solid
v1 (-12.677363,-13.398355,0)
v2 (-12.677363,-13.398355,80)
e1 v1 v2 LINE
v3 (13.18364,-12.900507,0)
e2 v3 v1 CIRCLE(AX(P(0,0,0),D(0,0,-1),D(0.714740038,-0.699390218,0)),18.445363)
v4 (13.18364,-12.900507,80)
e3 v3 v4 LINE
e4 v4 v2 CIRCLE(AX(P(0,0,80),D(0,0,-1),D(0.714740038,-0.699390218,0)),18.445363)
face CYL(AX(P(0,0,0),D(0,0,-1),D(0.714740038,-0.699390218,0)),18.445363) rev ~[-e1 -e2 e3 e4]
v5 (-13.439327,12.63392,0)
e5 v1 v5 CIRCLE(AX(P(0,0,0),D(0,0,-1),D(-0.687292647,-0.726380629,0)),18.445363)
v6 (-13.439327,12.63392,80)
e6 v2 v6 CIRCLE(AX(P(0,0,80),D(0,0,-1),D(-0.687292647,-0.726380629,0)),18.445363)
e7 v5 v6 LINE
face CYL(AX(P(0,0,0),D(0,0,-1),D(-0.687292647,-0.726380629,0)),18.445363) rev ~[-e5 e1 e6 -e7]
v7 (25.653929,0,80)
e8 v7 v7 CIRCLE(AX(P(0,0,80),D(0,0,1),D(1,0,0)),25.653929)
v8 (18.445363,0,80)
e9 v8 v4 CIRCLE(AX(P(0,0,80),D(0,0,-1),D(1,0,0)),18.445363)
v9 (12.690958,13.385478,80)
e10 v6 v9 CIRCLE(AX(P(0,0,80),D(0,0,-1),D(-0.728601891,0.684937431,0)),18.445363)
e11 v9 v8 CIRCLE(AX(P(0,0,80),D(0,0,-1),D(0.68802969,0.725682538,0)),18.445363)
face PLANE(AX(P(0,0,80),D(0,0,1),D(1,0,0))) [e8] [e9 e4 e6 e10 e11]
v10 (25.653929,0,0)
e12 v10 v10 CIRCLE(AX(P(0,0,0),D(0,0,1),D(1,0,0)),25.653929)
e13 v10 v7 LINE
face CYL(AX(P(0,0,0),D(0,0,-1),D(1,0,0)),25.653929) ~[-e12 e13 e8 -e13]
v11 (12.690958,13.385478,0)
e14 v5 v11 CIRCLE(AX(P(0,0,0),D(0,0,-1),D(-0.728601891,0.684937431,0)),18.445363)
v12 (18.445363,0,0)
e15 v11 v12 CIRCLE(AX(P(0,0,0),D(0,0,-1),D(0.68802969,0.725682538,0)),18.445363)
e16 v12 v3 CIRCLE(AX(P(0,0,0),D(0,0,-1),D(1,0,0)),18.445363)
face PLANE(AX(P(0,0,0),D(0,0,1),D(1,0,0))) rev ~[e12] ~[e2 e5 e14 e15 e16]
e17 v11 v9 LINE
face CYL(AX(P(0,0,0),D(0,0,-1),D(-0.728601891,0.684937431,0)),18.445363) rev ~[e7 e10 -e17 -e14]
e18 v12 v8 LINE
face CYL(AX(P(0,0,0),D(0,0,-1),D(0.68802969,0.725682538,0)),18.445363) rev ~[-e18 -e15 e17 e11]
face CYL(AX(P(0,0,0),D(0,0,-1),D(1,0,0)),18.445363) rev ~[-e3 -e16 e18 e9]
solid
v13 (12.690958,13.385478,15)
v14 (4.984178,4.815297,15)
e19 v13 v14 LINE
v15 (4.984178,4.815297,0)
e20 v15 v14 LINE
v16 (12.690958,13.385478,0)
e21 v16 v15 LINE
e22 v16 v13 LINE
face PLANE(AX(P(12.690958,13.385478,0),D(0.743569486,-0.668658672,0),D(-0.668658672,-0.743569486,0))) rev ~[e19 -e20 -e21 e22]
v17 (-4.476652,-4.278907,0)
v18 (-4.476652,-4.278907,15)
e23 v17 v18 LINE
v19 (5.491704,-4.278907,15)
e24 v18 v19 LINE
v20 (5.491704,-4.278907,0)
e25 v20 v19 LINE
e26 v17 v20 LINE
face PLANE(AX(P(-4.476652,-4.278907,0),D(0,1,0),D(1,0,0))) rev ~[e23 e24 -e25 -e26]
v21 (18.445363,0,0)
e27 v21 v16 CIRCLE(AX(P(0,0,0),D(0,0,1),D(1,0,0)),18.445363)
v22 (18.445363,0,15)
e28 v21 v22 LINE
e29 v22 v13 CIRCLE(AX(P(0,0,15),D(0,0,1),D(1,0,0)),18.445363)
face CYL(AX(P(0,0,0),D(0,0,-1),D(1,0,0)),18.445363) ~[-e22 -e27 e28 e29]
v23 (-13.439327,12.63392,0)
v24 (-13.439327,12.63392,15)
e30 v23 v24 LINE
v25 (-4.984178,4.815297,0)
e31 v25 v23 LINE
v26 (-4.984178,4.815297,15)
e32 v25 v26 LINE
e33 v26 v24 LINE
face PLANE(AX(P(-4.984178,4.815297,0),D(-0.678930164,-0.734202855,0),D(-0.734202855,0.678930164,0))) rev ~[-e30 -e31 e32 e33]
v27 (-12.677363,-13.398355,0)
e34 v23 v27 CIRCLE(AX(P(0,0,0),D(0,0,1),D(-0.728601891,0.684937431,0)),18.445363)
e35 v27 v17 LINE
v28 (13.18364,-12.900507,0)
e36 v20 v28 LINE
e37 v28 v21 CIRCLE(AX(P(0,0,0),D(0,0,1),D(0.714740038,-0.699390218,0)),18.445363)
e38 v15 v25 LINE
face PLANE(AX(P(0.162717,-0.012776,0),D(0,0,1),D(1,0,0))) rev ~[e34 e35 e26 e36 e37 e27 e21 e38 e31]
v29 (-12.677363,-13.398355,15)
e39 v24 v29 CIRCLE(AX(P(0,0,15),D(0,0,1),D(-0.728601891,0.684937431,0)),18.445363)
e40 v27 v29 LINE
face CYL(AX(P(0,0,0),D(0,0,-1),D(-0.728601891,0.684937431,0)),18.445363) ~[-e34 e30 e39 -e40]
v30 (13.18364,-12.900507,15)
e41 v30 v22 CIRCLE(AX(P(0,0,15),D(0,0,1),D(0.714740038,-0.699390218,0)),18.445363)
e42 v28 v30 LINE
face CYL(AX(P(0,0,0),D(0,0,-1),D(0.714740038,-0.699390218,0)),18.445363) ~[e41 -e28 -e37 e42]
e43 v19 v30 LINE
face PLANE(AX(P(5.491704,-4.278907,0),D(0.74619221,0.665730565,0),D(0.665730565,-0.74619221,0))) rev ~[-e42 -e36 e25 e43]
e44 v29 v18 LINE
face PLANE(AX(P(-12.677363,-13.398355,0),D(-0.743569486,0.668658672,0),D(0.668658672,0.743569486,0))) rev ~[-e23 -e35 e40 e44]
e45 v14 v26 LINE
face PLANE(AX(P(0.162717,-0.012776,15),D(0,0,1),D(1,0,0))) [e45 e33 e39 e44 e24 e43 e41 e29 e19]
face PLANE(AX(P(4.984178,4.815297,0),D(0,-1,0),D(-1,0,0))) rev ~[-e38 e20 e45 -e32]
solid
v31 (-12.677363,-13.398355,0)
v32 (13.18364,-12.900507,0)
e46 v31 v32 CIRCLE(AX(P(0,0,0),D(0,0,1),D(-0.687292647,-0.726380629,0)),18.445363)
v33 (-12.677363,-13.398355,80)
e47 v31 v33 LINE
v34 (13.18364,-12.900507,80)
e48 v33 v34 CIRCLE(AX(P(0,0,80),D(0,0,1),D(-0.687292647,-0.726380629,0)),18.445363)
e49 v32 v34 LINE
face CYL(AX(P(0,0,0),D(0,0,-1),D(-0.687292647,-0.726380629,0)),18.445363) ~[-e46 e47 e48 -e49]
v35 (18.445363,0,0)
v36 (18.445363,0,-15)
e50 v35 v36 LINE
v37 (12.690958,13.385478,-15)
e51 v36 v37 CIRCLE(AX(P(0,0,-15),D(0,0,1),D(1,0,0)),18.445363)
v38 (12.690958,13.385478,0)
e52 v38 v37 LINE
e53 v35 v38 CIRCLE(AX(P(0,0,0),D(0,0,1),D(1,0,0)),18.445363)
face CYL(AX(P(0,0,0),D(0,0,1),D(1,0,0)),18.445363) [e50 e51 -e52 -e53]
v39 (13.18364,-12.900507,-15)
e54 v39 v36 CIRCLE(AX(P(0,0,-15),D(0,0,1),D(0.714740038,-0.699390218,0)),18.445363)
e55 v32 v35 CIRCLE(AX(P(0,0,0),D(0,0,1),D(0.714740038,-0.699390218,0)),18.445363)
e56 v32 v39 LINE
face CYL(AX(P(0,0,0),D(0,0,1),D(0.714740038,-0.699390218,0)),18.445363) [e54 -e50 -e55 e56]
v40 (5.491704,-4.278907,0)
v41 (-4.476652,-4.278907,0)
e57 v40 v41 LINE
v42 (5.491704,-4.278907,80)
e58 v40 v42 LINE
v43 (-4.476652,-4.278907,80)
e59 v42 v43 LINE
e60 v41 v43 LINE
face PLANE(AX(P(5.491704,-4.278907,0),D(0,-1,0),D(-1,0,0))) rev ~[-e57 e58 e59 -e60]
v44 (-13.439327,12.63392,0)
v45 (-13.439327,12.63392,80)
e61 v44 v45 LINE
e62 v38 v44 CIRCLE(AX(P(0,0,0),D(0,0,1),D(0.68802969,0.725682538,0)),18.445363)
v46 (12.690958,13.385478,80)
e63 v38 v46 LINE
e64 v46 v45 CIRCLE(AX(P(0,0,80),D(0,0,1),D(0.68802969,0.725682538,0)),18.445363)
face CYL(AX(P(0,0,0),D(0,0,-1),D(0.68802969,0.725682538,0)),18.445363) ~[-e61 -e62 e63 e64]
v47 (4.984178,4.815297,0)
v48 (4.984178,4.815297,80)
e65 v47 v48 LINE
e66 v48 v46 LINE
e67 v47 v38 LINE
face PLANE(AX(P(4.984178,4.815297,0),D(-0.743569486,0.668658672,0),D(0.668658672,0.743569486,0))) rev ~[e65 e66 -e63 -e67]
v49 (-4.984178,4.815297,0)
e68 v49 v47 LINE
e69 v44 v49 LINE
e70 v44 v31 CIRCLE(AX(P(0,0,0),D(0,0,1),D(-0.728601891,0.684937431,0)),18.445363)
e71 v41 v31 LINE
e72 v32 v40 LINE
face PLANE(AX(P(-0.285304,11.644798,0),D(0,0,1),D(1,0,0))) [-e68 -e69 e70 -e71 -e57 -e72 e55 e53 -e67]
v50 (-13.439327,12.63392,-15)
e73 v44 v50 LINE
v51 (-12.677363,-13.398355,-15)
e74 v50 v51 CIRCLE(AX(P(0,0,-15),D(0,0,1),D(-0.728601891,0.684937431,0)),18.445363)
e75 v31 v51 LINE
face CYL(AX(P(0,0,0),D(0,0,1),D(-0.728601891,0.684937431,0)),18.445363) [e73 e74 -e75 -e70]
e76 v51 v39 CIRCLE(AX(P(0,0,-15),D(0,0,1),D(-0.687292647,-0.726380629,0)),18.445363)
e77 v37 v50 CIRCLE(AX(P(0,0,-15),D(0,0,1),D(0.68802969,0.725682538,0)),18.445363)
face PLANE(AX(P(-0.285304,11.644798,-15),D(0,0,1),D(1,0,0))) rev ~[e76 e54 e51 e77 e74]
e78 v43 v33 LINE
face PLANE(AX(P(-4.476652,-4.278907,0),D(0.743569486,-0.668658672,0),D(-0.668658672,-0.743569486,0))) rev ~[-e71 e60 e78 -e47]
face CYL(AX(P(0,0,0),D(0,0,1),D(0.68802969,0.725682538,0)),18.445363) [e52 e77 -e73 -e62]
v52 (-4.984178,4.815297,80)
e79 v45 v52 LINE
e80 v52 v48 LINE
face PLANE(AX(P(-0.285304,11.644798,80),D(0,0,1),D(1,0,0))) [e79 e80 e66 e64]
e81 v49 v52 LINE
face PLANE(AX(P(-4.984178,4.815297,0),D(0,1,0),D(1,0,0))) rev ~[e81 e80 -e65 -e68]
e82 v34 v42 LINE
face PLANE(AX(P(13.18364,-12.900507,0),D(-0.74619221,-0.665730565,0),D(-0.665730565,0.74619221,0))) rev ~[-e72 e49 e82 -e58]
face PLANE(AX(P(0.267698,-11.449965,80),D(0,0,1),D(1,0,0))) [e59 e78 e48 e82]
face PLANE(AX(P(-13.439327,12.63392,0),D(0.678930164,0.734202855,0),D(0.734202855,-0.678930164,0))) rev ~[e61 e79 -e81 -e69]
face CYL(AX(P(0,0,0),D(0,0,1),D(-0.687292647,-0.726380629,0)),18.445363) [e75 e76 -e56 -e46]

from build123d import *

# Parameters (mm, degrees)
F1_DEPTH = 15
F2_DEPTH = 15
F3_DEPTH = 80
F0_R     = 25.653928931
F4_DEPTH = 80


with BuildPart() as f1:
    # F0 (on Top) → F1 (new body)
    with BuildSketch(Plane.XY):
        with BuildLine():
            ThreePointArc((13.1836396394, -12.900506629), (17.0793508005, -6.9661468302), (18.4453632501, 0))
            ThreePointArc((18.4453632501, 0), (16.9458069689, 7.2849880988), (12.6909575623, 13.3854780108))
            Line((12.6909575623, 13.3854780108), (4.9841781147, 4.8152967356))
            Line((4.9841781147, 4.8152967356), (-4.9841781147, 4.8152967356))
            Line((-4.9841781147, 4.8152967356), (-13.4393265471, 12.6339197159))
            ThreePointArc((-13.4393265471, 12.6339197159), (-18.4374669621, -0.5396641983), (-12.6773625282, -13.398354554))
            Line((-12.6773625282, -13.398354554), (-4.4766523545, -4.2789067677))
            Line((-4.4766523545, -4.2789067677), (5.4917038749, -4.2789067677))
            Line((5.4917038749, -4.2789067677), (13.1836396394, -12.900506629))
        make_face()
    extrude(amount=F1_DEPTH)


with BuildPart() as f2:
    # F0 (on Top) → F2 (new body)
    with BuildSketch(Plane.XY):
        with BuildLine():
            Line((4.9841781147, 4.8152967356), (12.6909575623, 13.3854780108))
            ThreePointArc((12.6909575623, 13.3854780108), (-0.5303055742, 18.4377385117), (-13.4393265471, 12.6339197159))
            Line((-13.4393265471, 12.6339197159), (-4.9841781147, 4.8152967356))
            Line((-4.9841781147, 4.8152967356), (4.9841781147, 4.8152967356))
        make_face()
        with BuildLine():
            ThreePointArc((13.1836396394, -12.900506629), (17.0793508005, -6.9661468302), (18.4453632501, 0))
            ThreePointArc((18.4453632501, 0), (16.9458069689, 7.2849880988), (12.6909575623, 13.3854780108))
            Line((12.6909575623, 13.3854780108), (4.9841781147, 4.8152967356))
            Line((4.9841781147, 4.8152967356), (-4.9841781147, 4.8152967356))
            Line((-4.9841781147, 4.8152967356), (-13.4393265471, 12.6339197159))
            ThreePointArc((-13.4393265471, 12.6339197159), (-18.4374669621, -0.5396641983), (-12.6773625282, -13.398354554))
            Line((-12.6773625282, -13.398354554), (-4.4766523545, -4.2789067677))
            Line((-4.4766523545, -4.2789067677), (5.4917038749, -4.2789067677))
            Line((5.4917038749, -4.2789067677), (13.1836396394, -12.900506629))
        make_face()
        with BuildLine():
            ThreePointArc((-12.6773625282, -13.398354554), (0.3550243195, -18.4419462953), (13.1836396394, -12.900506629))
            Line((13.1836396394, -12.900506629), (5.4917038749, -4.2789067677))
            Line((5.4917038749, -4.2789067677), (-4.4766523545, -4.2789067677))
            Line((-4.4766523545, -4.2789067677), (-12.6773625282, -13.398354554))
        make_face()
    extrude(amount=-F2_DEPTH)

    # F0 (on Top) → F3 (join)
    with BuildSketch(Plane.XY):
        with BuildLine():
            ThreePointArc((-12.6773625282, -13.398354554), (0.3550243195, -18.4419462953), (13.1836396394, -12.900506629))
            Line((13.1836396394, -12.900506629), (5.4917038749, -4.2789067677))
            Line((5.4917038749, -4.2789067677), (-4.4766523545, -4.2789067677))
            Line((-4.4766523545, -4.2789067677), (-12.6773625282, -13.398354554))
        make_face()
        with BuildLine():
            Line((4.9841781147, 4.8152967356), (12.6909575623, 13.3854780108))
            ThreePointArc((12.6909575623, 13.3854780108), (-0.5303055742, 18.4377385117), (-13.4393265471, 12.6339197159))
            Line((-13.4393265471, 12.6339197159), (-4.9841781147, 4.8152967356))
            Line((-4.9841781147, 4.8152967356), (4.9841781147, 4.8152967356))
        make_face()
    extrude(amount=F3_DEPTH)


with BuildPart() as f4:
    # F0 (on Top) → F4 (new body)
    with BuildSketch(Plane.XY):
        Circle(F0_R)
        with BuildLine():
            ThreePointArc((12.6909575623, 13.3854780108), (16.9458069689, 7.2849880988), (18.4453632501, 0))
            ThreePointArc((18.4453632501, 0), (17.0793508005, -6.9661468302), (13.1836396394, -12.900506629))
            ThreePointArc((13.1836396394, -12.900506629), (0.3550243195, -18.4419462953), (-12.6773625282, -13.398354554))
            ThreePointArc((-12.6773625282, -13.398354554), (-18.4374669621, -0.5396641983), (-13.4393265471, 12.6339197159))
            ThreePointArc((-13.4393265471, 12.6339197159), (-0.5303055742, 18.4377385117), (12.6909575623, 13.3854780108))
        make_face(mode=Mode.SUBTRACT)
    extrude(amount=F4_DEPTH)


solid = Compound([f1.part, f2.part, f4.part])
